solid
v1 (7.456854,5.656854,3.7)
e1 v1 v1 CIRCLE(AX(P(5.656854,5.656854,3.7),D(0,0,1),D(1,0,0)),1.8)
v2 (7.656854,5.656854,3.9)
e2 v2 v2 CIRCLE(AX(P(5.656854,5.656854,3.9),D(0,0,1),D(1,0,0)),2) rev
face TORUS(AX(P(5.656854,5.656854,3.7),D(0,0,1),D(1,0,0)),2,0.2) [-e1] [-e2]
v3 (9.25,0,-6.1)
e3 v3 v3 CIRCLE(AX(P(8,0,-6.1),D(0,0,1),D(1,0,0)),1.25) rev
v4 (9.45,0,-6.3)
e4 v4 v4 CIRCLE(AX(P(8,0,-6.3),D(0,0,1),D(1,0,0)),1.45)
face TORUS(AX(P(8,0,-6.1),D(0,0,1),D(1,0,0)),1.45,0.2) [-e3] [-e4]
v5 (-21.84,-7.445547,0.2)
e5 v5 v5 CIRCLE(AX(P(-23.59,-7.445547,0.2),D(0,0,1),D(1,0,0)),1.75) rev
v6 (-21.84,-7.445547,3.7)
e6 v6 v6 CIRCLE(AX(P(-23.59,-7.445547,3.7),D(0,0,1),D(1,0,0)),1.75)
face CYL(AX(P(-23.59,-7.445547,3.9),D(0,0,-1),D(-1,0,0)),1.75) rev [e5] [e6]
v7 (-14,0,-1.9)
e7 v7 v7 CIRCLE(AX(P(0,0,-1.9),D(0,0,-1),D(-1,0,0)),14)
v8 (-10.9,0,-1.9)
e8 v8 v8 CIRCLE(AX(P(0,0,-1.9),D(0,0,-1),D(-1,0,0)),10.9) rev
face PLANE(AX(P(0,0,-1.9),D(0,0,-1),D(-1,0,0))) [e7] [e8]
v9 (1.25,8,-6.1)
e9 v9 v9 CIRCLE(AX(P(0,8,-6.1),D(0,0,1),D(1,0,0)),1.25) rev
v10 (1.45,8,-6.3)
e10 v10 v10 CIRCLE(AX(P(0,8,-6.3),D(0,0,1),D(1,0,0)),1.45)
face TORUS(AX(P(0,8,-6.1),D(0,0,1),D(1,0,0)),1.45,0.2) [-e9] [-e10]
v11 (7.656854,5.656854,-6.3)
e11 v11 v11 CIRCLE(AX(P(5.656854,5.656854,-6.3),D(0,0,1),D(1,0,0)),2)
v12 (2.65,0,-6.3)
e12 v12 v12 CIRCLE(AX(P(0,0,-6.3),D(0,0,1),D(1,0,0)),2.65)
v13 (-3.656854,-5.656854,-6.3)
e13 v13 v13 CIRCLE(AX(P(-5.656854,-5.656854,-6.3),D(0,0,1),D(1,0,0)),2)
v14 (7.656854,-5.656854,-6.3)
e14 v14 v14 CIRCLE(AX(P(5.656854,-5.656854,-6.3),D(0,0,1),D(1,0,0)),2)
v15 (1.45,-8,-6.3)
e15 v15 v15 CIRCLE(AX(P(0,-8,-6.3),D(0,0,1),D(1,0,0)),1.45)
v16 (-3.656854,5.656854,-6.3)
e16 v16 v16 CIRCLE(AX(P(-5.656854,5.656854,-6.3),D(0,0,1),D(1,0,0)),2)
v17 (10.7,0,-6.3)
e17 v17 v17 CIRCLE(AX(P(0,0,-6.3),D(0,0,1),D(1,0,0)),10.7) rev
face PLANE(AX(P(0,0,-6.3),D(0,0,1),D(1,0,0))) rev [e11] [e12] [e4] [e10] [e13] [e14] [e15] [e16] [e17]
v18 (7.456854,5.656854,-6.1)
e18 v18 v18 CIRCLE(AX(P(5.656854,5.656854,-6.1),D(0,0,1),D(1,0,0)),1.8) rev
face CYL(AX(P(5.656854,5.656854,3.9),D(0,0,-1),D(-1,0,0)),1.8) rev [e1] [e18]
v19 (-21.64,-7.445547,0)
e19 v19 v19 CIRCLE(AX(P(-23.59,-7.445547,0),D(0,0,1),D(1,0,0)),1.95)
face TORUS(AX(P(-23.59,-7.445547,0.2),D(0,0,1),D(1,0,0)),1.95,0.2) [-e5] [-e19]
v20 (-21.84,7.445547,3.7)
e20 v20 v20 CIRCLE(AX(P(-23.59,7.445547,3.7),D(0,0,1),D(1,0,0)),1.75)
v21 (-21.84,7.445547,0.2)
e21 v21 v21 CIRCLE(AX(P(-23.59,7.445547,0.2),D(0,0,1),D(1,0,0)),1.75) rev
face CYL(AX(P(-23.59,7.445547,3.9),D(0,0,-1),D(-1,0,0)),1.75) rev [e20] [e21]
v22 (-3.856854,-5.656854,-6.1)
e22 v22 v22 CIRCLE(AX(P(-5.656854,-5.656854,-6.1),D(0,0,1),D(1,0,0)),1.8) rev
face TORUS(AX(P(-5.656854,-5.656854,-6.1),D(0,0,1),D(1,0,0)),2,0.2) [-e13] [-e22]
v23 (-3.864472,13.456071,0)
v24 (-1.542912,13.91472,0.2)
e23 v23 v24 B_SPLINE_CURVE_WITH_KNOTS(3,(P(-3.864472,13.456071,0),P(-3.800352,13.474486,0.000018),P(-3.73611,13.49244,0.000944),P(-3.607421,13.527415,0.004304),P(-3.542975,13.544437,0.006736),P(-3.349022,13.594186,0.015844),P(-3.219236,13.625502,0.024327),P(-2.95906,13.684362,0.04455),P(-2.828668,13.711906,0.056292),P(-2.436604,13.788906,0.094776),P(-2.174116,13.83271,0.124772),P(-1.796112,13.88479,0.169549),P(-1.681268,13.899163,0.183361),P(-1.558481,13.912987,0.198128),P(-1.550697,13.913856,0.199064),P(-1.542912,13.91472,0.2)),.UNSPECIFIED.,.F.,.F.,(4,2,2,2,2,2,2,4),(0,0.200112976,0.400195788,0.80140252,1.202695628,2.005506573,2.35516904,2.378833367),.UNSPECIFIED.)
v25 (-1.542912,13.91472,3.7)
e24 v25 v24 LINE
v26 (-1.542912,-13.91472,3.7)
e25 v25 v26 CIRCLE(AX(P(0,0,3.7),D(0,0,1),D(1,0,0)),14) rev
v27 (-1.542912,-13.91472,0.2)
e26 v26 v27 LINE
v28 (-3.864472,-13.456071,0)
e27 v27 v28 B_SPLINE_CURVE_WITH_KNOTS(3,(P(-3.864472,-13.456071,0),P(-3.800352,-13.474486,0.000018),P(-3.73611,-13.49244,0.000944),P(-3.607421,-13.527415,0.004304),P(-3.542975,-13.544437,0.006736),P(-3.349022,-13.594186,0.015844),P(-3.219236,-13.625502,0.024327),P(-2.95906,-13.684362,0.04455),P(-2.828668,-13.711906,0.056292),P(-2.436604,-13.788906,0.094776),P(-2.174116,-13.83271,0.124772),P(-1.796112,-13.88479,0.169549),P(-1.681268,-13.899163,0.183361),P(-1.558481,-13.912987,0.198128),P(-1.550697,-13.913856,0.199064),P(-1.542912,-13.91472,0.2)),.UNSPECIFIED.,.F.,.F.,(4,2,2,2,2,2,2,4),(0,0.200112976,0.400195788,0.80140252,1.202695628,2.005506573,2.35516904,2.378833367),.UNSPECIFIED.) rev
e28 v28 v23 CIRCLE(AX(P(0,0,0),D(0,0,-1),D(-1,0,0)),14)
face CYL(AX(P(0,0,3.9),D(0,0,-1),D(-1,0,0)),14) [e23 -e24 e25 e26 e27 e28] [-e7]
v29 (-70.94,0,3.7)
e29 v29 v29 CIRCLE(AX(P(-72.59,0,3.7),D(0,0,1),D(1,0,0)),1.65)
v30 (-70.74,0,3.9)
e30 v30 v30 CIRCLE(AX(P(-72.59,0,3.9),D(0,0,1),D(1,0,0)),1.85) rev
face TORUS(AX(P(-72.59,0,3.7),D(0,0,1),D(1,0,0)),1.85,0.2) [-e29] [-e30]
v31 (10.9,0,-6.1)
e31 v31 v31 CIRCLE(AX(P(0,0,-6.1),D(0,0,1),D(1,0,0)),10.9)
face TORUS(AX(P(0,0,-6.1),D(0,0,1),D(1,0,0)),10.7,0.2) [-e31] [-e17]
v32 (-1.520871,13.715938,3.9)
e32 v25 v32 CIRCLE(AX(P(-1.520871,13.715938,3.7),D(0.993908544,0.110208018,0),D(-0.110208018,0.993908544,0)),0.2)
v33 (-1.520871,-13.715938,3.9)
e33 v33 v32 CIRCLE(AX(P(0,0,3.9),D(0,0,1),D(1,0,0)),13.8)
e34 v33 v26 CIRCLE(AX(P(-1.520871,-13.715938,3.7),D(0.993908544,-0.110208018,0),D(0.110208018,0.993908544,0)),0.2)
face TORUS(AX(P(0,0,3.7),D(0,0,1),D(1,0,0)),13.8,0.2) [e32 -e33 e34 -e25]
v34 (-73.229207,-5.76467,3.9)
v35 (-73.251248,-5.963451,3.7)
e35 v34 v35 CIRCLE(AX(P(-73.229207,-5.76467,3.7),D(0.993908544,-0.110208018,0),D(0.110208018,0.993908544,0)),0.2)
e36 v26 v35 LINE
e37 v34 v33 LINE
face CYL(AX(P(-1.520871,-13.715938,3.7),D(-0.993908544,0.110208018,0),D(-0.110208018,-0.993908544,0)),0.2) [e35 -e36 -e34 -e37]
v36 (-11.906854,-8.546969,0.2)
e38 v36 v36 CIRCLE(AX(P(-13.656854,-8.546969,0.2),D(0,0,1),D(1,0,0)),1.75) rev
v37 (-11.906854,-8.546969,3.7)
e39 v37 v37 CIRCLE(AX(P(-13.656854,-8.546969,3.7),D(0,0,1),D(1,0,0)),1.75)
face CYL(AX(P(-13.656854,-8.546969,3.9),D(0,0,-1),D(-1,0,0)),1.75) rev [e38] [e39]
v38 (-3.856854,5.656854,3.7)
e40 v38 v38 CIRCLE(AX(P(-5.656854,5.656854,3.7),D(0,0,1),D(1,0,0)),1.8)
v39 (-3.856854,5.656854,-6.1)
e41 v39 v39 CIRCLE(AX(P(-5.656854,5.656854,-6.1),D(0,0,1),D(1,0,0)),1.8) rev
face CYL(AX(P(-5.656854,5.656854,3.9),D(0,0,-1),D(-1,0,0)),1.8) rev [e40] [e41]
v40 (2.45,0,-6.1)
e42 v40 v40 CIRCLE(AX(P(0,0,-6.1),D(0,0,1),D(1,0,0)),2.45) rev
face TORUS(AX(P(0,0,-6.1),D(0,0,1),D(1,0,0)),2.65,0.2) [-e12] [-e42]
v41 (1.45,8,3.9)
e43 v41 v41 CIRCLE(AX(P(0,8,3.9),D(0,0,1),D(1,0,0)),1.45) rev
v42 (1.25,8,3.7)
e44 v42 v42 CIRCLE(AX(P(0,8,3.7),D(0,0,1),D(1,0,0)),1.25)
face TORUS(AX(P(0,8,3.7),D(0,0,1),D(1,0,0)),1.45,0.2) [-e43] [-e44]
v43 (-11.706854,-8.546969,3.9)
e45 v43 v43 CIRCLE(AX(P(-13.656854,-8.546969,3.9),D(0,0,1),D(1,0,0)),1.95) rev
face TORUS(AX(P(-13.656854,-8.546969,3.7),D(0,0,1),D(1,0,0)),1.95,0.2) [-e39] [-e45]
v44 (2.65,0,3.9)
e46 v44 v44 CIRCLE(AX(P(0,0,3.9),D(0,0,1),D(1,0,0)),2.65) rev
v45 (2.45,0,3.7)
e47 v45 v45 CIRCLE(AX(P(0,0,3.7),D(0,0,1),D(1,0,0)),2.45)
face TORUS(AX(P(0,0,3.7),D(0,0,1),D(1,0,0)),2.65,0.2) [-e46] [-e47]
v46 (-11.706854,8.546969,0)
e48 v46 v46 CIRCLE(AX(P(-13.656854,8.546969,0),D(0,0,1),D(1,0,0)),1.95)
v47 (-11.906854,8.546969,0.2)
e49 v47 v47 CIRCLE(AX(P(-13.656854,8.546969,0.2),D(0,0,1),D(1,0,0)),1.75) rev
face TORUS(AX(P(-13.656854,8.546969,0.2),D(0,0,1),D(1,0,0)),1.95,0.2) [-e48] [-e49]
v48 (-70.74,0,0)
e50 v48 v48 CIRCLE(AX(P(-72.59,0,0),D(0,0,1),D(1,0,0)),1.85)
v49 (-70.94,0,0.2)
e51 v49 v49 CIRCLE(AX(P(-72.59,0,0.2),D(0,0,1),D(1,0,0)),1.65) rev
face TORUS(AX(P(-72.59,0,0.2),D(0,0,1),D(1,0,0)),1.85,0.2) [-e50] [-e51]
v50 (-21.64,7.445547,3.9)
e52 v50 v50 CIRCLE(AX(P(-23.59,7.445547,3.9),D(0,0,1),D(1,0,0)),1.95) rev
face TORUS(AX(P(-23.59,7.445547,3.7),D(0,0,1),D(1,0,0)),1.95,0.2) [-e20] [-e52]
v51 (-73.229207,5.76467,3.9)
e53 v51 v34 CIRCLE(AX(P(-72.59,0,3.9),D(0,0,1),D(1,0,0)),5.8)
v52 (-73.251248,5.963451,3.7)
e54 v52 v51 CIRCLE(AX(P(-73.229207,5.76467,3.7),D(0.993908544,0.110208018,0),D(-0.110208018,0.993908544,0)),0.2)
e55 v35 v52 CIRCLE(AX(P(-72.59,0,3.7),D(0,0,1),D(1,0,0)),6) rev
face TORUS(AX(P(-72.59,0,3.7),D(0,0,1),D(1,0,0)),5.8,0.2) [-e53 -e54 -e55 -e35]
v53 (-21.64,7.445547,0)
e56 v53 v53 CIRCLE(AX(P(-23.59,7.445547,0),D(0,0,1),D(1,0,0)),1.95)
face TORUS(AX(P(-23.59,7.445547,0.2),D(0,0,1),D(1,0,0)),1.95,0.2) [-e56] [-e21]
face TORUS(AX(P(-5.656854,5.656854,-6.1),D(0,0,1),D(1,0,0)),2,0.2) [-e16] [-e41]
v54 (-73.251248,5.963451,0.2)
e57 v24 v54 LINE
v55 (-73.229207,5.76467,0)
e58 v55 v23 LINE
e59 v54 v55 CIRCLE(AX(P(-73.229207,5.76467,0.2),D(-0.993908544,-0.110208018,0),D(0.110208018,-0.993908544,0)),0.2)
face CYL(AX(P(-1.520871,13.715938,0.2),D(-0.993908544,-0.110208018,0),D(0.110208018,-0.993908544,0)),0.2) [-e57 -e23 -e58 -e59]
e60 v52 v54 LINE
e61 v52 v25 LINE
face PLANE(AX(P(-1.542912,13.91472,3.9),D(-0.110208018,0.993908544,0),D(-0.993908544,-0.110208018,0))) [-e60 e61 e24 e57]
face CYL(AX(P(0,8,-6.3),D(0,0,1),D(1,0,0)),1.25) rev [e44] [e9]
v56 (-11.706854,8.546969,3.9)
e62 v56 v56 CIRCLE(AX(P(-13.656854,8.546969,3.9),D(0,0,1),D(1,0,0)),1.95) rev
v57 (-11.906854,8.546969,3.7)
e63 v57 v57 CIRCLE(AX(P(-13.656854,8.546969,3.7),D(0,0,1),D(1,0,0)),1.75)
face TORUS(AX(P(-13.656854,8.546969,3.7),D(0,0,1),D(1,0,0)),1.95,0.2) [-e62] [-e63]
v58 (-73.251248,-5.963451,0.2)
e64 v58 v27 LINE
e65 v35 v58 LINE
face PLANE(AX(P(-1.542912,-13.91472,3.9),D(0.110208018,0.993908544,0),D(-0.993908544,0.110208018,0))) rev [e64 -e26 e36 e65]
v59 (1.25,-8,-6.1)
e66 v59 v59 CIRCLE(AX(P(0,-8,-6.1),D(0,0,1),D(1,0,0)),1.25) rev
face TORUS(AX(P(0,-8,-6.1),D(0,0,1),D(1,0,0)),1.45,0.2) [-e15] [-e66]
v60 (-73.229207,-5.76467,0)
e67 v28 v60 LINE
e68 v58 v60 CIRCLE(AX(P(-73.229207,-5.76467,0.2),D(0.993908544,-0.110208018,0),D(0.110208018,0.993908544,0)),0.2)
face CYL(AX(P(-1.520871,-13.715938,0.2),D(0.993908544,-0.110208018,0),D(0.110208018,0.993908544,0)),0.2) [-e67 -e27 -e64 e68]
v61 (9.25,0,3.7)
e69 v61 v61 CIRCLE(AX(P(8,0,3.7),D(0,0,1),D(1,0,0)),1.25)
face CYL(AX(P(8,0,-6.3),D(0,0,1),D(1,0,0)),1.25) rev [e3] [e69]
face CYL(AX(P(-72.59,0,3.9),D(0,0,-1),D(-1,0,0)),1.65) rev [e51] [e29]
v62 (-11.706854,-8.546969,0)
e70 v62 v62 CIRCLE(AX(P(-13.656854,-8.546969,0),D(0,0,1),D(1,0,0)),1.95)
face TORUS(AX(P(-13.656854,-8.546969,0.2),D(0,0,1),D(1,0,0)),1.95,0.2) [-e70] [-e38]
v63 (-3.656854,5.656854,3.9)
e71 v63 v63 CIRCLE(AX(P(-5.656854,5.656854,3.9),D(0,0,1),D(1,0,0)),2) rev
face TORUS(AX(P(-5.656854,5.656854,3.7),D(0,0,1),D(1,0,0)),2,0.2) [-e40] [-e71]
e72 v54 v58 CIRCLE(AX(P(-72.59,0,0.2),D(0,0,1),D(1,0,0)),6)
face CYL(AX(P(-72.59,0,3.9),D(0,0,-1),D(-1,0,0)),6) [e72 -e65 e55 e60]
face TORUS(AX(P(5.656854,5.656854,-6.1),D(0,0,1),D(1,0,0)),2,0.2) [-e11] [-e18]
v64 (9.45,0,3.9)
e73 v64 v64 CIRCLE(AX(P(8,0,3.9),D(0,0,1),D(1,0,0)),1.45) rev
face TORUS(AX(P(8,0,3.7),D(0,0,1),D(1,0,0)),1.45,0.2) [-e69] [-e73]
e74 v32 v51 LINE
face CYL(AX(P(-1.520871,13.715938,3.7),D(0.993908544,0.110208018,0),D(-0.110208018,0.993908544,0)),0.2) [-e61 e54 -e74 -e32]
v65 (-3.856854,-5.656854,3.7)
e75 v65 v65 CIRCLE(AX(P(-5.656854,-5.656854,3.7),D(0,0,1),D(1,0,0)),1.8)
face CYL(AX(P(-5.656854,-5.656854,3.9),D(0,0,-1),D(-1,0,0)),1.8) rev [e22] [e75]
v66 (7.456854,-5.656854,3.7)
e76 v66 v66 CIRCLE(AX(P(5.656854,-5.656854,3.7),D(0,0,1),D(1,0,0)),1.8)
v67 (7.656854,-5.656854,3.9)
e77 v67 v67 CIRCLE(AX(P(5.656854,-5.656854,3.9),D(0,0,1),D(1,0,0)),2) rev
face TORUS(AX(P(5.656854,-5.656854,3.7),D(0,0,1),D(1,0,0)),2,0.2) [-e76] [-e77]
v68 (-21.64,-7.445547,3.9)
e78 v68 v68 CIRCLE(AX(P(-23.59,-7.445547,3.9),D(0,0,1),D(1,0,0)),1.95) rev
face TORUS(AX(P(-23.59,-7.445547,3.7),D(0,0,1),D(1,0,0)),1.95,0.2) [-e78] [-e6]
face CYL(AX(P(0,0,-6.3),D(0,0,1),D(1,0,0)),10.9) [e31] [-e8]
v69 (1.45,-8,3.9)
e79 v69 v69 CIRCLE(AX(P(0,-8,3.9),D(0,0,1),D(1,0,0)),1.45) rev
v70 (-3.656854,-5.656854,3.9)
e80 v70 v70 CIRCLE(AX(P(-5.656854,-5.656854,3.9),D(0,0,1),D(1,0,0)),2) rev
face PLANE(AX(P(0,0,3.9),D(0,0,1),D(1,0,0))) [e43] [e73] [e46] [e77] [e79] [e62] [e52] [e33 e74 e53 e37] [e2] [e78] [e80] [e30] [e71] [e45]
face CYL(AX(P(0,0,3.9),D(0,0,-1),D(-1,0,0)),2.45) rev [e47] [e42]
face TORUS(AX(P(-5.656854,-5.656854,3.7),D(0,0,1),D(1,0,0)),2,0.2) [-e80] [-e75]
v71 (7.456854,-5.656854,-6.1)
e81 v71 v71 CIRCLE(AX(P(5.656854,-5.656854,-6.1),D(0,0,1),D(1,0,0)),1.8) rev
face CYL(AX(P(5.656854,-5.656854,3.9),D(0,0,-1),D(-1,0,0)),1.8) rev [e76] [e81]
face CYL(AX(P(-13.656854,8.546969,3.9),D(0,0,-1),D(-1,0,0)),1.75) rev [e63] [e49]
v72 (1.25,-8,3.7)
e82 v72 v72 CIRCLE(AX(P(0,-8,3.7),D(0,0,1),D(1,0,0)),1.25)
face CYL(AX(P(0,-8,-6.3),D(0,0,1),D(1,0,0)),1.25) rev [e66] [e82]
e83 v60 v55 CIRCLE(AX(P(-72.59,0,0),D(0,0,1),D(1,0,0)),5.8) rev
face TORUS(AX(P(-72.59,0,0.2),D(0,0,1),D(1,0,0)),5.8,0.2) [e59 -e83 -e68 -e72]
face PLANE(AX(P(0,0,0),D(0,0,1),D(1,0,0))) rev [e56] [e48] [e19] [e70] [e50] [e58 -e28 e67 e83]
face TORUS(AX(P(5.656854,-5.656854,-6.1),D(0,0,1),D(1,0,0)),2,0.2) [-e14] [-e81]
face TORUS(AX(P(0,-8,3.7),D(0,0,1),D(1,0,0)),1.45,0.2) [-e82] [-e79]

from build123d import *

# Parameters (mm, degrees)
SKETCH_1_R          = 1.7999999999999998
SKETCH_1_R_2        = 1.8000000000000007
SKETCH_1_R_3        = 1.6500000000000021
SKETCH_1_R_4        = 1.7500000000000004
SKETCH_1_R_5        = 1.7499999999999998
SKETCH_1_R_6        = 1.7500000000000009
EXTRUDE_1_DEPTH     = 3.9
EXTRUDE_START       = -6.300000000000001
SKETCH_1_6_R        = 10.9
SKETCH_1_6_R_2      = 1.7999999999999998
SKETCH_1_6_R_3      = 1.8000000000000007
SKETCH_1_6_R_4      = 4
EXTRUDE_2_DEPTH     = 6.300000000000001
EXTRUDE_START_2     = 1.9
SKETCH_3_R          = 10.9
EXTRUDE_3_DEPTH     = 1.9
SKETCH_4_R          = 2.45
CUT_EXTRUDE_2_DEPTH = 81.47625798954623
SKETCH_5_R          = 1.2499999999999998
SKETCH_5_R_2        = 1.2500000000000002
SKETCH_5_R_3        = 1.2499999999999991
CUT_EXTRUDE_3_DEPTH = 81.47625798954623
FILLET_2_R          = 0.2
FILLET_3_R          = 0.2


with BuildPart() as part:
    # 스케치1 → 보스-돌출1 (new body)
    with BuildSketch(Plane.XY):
        with BuildLine():
            Line((-73.25124810579969, 5.96345126102127), (-1.5429122468659604, 13.914719609049653))
            ThreePointArc((-1.5429122468659604, 13.914719609049653), (13.999999999999996, 3.11e-15), (-1.5429122468659573, -13.914719609049653))
            Line((-1.5429122468659573, -13.914719609049653), (-73.25124810579969, -5.963451261021289))
            ThreePointArc((-73.25124810579969, -5.963451261021289), (-78.59, -8.15e-15), (-73.25124810579969, 5.96345126102127))
        make_face()
        with Locations((5.656854249492369, 5.65685424949239)):
            Circle(SKETCH_1_R, mode=Mode.SUBTRACT)
        with Locations((5.65685424949239, -5.656854249492369)):
            Circle(SKETCH_1_R_2, mode=Mode.SUBTRACT)
        with Locations((-5.656854249492368, -5.656854249492391)):
            Circle(SKETCH_1_R, mode=Mode.SUBTRACT)
        with Locations((-5.656854249492391, 5.656854249492368)):
            Circle(SKETCH_1_R, mode=Mode.SUBTRACT)
        with Locations((-72.59, -8.89e-15)):
            Circle(SKETCH_1_R_3, mode=Mode.SUBTRACT)
        with Locations((-23.590000000000003, 7.445547090223239)):
            Circle(SKETCH_1_R_4, mode=Mode.SUBTRACT)
        with Locations((-13.656854249492396, 8.546968653787863)):
            Circle(SKETCH_1_R_5, mode=Mode.SUBTRACT)
        with Locations((-13.656854249492392, -8.546968653787866)):
            Circle(SKETCH_1_R_5, mode=Mode.SUBTRACT)
        with Locations((-23.590000000000003, -7.445547090223244)):
            Circle(SKETCH_1_R_6, mode=Mode.SUBTRACT)
    extrude(amount=EXTRUDE_1_DEPTH)

    # 스케치1<6> → 보스-돌출2 (add)
    # profile 1 of 2: a face of its own
    with BuildSketch(Plane.XY.offset(EXTRUDE_START)):
        Circle(SKETCH_1_6_R)
        with Locations((5.656854249492369, 5.65685424949239)):
            Circle(SKETCH_1_6_R_2, mode=Mode.SUBTRACT)
        with Locations((5.65685424949239, -5.656854249492369)):
            Circle(SKETCH_1_6_R_3, mode=Mode.SUBTRACT)
        with Locations((-5.656854249492368, -5.656854249492391)):
            Circle(SKETCH_1_6_R_2, mode=Mode.SUBTRACT)
        with Locations((-5.656854249492391, 5.656854249492368)):
            Circle(SKETCH_1_6_R_2, mode=Mode.SUBTRACT)
        Circle(SKETCH_1_6_R_4, mode=Mode.SUBTRACT)
    # profile 2 of 2: a face of its own
    with BuildSketch(Plane.XY.offset(EXTRUDE_START)):
        Circle(SKETCH_1_6_R_4)
    extrude(amount=EXTRUDE_2_DEPTH)

    # 스케치3 → 보스-돌출3 (add)
    with BuildSketch(Plane(origin=(0, 0, 0), x_dir=(-1, 0, 0), z_dir=(0, 0, -1)).offset(EXTRUDE_START_2)):
        with BuildLine():
            ThreePointArc((1.542912246865952, -13.914719609049655), (10.43074233830275, -9.33807337045166), (13.999999999999998, -3.43e-15))
            ThreePointArc((13.999999999999998, 0), (10.430742338302759, 9.338073370451651), (1.5429122468659615, 13.914719609049655))
            ThreePointArc((1.5429122468659602, 13.914719609049653), (-14, -2.2e-16), (1.5429122468659566, -13.914719609049659))
        make_face()
        with Locations(Location((0, 0, 0), (0, 0, 180))):
            Circle(SKETCH_3_R, mode=Mode.SUBTRACT)
    extrude(amount=-EXTRUDE_3_DEPTH)

    # 스케치4 → 컷-돌출2 (cut, through all)
    with BuildSketch(Plane(origin=(0, 0, -6.300000000000001), x_dir=(-1, 0, 0), z_dir=(0, 0, -1))):
        Circle(SKETCH_4_R)
    extrude(amount=-CUT_EXTRUDE_2_DEPTH, mode=Mode.SUBTRACT)

    # 스케치5 → 컷-돌출3 (cut, through all)
    with BuildSketch(Plane.XY.offset(3.9)):
        with Locations((7.3e-16, 8)):
            Circle(SKETCH_5_R)
        with Locations((2.69e-15, -8)):
            Circle(SKETCH_5_R_2)
        with Locations((8, 0)):
            Circle(SKETCH_5_R_3)
    extrude(amount=-CUT_EXTRUDE_3_DEPTH, mode=Mode.SUBTRACT)

    # 필렛2
    fillet_2_edges = [part.edges().sort_by_distance(p)[0] for p in [
        (-15.406854249492392, -8.546968653787866, 3.9),
        (-15.406854249492396, 8.546968653787863, 3.9),
        (-25.340000000000003, 7.445547090223239, 3.9),
        (-74.24000000000001, -9.42e-15, 3.9),
        (-37.39708017633283, 9.939085435035462, 3.9),
        (-78.59000000000002, -9.77e-15, 3.9),
        (-10.9, 1.33e-15, -6.300000000000001),
        (-7.456854249492391, 5.656854249492368, -6.300000000000001),
        (-7.456854249492368, -5.656854249492391, -6.300000000000001),
        (-37.39708017633283, -9.939085435035471, 3.9),
        (3.8568542494923896, -5.65685424949237, -6.300000000000001),
        (3.856854249492369, 5.65685424949239, -6.300000000000001),
        (13.999999999999998, 2e-15, 3.9),
        (-25.340000000000003, -7.445547090223244, 3.9),
        (-7.456854249492391, 5.656854249492368, 3.9),
        (-7.456854249492368, -5.656854249492391, 3.9),
        (2.45, 3e-16, 3.9000000000000004),
        (3.8568542494923896, -5.65685424949237, 3.9),
        (2.45, 3e-16, -6.300000000000001),
        (3.856854249492369, 5.65685424949239, 3.9),
        (-1.2499999999999991, 8, -6.300000000000001),
        (-1.2499999999999991, 8, 3.9),
        (6.750000000000001, 1.5e-16, -6.300000000000001),
        (6.750000000000001, 1.5e-16, 3.9),
        (-1.2499999999999976, -8, -6.300000000000001),
        (-1.2499999999999976, -8, 3.9),
    ]]
    fillet(fillet_2_edges, radius=FILLET_2_R)

    # 필렛3
    # the kernel refuses this fillet: 0.2 mm, written as the material it takes off along each edge
    with BuildSketch(Plane(origin=(-23.590000000000003, -7.445547090223244, 0), x_dir=(1, 0, 0), z_dir=(0, -1, 0))) as fillet_3_piece_1:
        with BuildLine():
            CenterArc((1.75 + FILLET_3_R, FILLET_3_R), FILLET_3_R, 180, 90)
            Line((1.75, FILLET_3_R), (1.75, 0))
            Line((1.75, 0), (1.75 + FILLET_3_R, 0))
        make_face()
    revolve(axis=Axis((-23.590000000000003, -7.445547090223244, 0), (0, 0, 1)), mode=Mode.SUBTRACT)
    with BuildSketch(Plane(origin=(-1.0459579751141845, -13.969823617866295, 0), x_dir=(0.11020801763328267, 0.993908543503547, 0), z_dir=(-0.993908543503547, 0.11020801763328267, 0))) as fillet_3_piece_2_section:
        with BuildLine():
            CenterArc((FILLET_3_R, -FILLET_3_R), FILLET_3_R, 90, 90)
            Line((0, -FILLET_3_R), (0, 0))
            Line((0, 0), (FILLET_3_R, 0))
        make_face()
    fillet_3_piece_2 = extrude(amount=72.64782117292246, mode=Mode.PRIVATE)
    fillet_3_piece_2 = fillet_3_piece_2 - Plane(origin=(4.4e-16, 8.9e-16, 0.0449378973195656), x_dir=(-0.11020801763328296, 0.993908543503547, 0), z_dir=(0, 0, -1)) * Cylinder(13.999999999999998, 147, mode=Mode.PRIVATE)
    add(fillet_3_piece_2, mode=Mode.SUBTRACT)
    with BuildSketch(Plane(origin=(-72.59000000000002, -9.55e-15, 0), x_dir=(-0.11020801763327874, -0.9939085435035473, 0), z_dir=(0.9939085435035473, -0.11020801763327874, 0))) as fillet_3_piece_3:
        with BuildLine():
            CenterArc((5.999999999999993 - FILLET_3_R, -FILLET_3_R), FILLET_3_R, 0, 90)
            Line((5.999999999999993 - FILLET_3_R, 3e-17), (5.999999999999993, 0))
            Line((5.999999999999993, 0), (5.999999999999993, -FILLET_3_R))
        make_face()
    revolve(axis=Axis((-72.59000000000002, -9.55e-15, 0), (0, 0, -1)), revolution_arc=167.34538598213177, mode=Mode.SUBTRACT)
    with BuildSketch(Plane(origin=(-73.25124810579969, 5.96345126102127, 0), x_dir=(0, 0, 1), z_dir=(0.9939085435035471, 0.11020801763328296, 0))) as fillet_3_piece_4_section:
        with BuildLine():
            CenterArc((FILLET_3_R, FILLET_3_R), FILLET_3_R, 180, 90)
            Line((-3e-17, FILLET_3_R), (0, 0))
            Line((0, 0), (FILLET_3_R, 0))
        make_face()
    fillet_3_piece_4 = extrude(amount=72.64782117292248, mode=Mode.PRIVATE)
    fillet_3_piece_4 = fillet_3_piece_4 - Plane(origin=(4.4e-16, 8.9e-16, 0.04493768276162775), x_dir=(-0.11020801763328296, 0.993908543503547, 0), z_dir=(0, 0, -1)) * Cylinder(13.999999999999998, 147, mode=Mode.PRIVATE)
    add(fillet_3_piece_4, mode=Mode.SUBTRACT)
    with BuildSketch(Plane(origin=(-72.59, -8.89e-15, 0), x_dir=(1, 0, 0), z_dir=(0, -1, 0))) as fillet_3_piece_5:
        with BuildLine():
            CenterArc((1.6500000000000057 + FILLET_3_R, FILLET_3_R), FILLET_3_R, 180, 90)
            Line((1.6500000000000057, FILLET_3_R), (1.6500000000000057, 0))
            Line((1.6500000000000057, 0), (1.6500000000000057 + FILLET_3_R, 0))
        make_face()
    revolve(axis=Axis((-72.59, -8.89e-15, 0), (0, 0, 1)), mode=Mode.SUBTRACT)
    with BuildSketch(Plane(origin=(-23.590000000000003, 7.445547090223239, 0), x_dir=(1, 0, 0), z_dir=(0, -1, 0))) as fillet_3_piece_6:
        with BuildLine():
            CenterArc((1.75 + FILLET_3_R, FILLET_3_R), FILLET_3_R, 180, 90)
            Line((1.75, FILLET_3_R), (1.75, 0))
            Line((1.75, 0), (1.75 + FILLET_3_R, 0))
        make_face()
    revolve(axis=Axis((-23.590000000000003, 7.445547090223239, 0), (0, 0, 1)), mode=Mode.SUBTRACT)
    with BuildSketch(Plane(origin=(-13.656854249492396, 8.546968653787863, 0), x_dir=(1, 0, 0), z_dir=(0, -1, 0))) as fillet_3_piece_7:
        with BuildLine():
            CenterArc((1.75 + FILLET_3_R, FILLET_3_R), FILLET_3_R, 180, 90)
            Line((1.7499999999999982, FILLET_3_R), (1.75, 0))
            Line((1.75, 0), (1.75 + FILLET_3_R, 0))
        make_face()
    revolve(axis=Axis((-13.656854249492396, 8.546968653787863, 0), (0, 0, 1)), mode=Mode.SUBTRACT)
    with BuildSketch(Plane(origin=(-13.656854249492392, -8.546968653787866, 0), x_dir=(1, 0, 0), z_dir=(0, -1, 0))) as fillet_3_piece_8:
        with BuildLine():
            CenterArc((1.75 + FILLET_3_R, FILLET_3_R), FILLET_3_R, 180, 90)
            Line((1.7500000000000018, FILLET_3_R), (1.75, 0))
            Line((1.75, 0), (1.75 + FILLET_3_R, 0))
        make_face()
    revolve(axis=Axis((-13.656854249492392, -8.546968653787866, 0), (0, 0, 1)), mode=Mode.SUBTRACT)


solid = part.part
